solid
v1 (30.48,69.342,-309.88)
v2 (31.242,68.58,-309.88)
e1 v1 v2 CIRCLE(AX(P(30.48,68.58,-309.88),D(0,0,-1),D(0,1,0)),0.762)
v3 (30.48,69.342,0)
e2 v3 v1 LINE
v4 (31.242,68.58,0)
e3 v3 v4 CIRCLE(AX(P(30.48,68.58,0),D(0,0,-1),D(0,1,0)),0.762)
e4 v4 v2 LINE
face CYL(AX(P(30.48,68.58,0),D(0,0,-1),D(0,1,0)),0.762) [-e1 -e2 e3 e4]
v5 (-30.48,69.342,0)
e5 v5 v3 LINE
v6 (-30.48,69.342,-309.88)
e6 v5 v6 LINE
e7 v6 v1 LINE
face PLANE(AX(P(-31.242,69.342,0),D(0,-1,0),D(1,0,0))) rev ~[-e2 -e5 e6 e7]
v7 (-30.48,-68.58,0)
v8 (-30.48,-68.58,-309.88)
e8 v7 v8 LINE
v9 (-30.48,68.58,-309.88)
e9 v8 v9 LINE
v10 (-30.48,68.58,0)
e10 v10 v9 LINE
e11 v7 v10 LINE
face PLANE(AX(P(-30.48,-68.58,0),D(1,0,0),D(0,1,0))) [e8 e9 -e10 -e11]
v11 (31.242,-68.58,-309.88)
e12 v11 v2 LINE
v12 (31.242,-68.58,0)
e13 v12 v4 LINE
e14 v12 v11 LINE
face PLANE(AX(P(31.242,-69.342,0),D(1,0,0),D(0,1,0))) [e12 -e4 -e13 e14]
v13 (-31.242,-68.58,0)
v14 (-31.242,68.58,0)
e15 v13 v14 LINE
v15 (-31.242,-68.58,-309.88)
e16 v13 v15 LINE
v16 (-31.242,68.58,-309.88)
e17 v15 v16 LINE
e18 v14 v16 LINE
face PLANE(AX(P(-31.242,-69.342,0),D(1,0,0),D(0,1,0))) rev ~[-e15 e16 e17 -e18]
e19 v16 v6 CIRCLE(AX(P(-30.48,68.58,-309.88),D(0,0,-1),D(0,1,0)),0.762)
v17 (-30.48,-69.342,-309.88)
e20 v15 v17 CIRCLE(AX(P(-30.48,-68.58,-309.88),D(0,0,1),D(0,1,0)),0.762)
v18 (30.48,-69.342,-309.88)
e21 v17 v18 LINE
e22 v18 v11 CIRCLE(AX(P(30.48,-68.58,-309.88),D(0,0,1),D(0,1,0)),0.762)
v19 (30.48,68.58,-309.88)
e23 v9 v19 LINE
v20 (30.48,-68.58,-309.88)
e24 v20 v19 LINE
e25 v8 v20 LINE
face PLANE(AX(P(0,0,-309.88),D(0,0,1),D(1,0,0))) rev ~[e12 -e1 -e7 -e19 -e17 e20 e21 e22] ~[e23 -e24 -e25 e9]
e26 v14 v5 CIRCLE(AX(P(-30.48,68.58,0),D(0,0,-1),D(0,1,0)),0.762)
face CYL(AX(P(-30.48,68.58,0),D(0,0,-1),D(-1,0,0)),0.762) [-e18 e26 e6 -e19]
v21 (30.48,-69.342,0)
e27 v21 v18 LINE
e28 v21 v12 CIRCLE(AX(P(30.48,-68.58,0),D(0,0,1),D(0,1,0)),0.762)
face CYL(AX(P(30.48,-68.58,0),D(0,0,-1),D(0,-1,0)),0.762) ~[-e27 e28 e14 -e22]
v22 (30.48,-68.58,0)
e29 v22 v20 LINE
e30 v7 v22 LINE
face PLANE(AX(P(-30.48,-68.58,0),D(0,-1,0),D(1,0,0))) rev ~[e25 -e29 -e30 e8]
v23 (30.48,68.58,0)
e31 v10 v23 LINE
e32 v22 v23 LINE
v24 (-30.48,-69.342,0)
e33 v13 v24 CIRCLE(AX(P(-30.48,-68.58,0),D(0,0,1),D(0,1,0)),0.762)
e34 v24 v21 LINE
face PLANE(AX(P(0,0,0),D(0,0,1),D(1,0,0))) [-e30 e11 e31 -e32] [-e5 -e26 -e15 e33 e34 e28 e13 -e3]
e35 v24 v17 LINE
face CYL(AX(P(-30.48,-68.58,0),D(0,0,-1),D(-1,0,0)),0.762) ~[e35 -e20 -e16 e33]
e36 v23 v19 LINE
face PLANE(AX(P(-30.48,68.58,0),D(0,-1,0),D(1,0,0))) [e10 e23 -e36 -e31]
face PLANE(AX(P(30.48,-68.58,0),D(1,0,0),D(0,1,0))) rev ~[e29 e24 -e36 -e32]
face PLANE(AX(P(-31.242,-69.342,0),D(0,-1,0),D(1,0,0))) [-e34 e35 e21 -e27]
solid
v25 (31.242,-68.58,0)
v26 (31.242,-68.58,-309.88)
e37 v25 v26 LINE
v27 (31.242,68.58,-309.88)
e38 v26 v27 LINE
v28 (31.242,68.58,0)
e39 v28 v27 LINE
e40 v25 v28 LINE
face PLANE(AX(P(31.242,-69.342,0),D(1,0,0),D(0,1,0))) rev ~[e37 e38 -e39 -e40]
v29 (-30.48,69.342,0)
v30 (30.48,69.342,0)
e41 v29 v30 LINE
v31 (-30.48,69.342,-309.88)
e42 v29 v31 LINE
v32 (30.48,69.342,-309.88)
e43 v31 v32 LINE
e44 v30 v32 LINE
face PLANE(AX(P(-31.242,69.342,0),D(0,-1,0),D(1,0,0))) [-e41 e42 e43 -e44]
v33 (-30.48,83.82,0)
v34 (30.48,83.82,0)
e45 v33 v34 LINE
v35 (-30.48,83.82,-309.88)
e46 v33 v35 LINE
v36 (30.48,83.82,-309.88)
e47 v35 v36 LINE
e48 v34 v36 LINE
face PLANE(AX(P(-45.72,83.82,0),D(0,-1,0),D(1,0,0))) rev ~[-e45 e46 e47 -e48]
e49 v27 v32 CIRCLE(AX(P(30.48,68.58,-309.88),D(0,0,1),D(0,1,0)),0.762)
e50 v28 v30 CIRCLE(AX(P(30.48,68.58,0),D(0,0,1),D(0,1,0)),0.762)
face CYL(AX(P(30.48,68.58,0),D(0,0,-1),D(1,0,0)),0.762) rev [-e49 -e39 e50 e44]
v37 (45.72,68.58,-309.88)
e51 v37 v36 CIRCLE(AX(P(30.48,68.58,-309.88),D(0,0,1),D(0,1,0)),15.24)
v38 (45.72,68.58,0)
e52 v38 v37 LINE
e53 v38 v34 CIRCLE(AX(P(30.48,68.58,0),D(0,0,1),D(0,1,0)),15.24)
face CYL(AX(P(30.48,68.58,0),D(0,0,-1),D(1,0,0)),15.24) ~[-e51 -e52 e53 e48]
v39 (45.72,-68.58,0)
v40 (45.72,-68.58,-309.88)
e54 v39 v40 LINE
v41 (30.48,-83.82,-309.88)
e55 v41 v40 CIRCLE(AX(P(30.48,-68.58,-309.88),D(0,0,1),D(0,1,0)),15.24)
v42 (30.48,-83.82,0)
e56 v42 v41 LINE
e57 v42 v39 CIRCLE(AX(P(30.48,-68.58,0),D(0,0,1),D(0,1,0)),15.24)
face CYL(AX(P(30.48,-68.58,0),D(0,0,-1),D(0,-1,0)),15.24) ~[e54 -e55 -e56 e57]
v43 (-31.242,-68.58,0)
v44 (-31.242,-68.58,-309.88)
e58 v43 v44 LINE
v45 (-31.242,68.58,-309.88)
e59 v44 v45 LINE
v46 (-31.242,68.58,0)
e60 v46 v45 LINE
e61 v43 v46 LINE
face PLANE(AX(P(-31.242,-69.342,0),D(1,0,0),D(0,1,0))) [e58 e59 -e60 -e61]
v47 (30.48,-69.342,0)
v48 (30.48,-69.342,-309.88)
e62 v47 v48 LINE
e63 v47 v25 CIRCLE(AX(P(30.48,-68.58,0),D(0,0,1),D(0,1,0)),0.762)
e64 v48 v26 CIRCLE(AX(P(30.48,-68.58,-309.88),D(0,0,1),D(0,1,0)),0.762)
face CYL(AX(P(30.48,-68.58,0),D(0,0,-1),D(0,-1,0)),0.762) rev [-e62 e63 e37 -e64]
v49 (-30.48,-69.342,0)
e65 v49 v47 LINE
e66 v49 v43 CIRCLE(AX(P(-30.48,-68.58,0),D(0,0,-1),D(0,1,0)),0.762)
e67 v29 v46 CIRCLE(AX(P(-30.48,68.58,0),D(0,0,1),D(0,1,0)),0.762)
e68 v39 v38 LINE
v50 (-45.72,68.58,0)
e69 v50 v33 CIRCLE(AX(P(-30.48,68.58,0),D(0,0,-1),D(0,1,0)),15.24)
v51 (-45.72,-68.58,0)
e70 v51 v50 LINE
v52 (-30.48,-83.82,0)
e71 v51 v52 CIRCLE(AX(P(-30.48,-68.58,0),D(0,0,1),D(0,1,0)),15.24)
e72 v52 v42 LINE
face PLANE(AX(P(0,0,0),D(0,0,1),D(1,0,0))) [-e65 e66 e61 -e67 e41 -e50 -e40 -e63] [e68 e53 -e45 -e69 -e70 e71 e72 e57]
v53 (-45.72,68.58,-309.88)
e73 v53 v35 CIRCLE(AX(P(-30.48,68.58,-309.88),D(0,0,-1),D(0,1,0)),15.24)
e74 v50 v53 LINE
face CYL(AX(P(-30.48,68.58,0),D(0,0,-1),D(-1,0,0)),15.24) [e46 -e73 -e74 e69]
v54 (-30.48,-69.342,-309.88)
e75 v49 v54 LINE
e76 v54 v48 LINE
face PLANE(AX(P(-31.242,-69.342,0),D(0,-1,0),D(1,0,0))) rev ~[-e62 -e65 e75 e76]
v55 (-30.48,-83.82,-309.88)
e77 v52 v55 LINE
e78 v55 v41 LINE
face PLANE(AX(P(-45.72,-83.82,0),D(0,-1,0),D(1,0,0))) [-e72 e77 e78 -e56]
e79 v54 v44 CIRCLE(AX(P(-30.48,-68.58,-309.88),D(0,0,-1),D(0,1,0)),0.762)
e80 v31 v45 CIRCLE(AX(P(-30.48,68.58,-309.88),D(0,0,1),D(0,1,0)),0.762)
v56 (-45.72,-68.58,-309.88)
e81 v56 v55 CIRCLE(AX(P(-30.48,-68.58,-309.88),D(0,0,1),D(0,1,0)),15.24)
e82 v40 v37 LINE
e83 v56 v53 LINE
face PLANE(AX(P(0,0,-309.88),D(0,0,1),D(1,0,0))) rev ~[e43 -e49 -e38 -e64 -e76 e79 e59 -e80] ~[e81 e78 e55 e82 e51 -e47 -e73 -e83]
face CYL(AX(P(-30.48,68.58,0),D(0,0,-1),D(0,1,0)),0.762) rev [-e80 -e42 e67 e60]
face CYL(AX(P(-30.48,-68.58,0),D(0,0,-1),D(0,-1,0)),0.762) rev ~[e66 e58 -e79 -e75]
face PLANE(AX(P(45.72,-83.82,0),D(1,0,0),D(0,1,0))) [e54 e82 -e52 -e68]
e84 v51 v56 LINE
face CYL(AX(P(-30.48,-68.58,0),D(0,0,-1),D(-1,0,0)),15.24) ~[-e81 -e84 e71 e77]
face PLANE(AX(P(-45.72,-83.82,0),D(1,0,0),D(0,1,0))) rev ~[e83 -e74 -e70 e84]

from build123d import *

# Parameters (mm, degrees)
F5_W      = 91.44
F5_H      = 167.64
F6_DEPTH  = 309.88
F7_R      = 15.24
F8_W      = 62.484
F8_H      = 138.684
F9_DEPTH  = 309.88
F10_W     = 62.484
F10_H     = 138.684
F11_DEPTH = 309.88
F12_W     = 60.96
F12_H     = 137.16
F13_DEPTH = 309.88
F14_R     = 0.762
F15_R     = 0.762


with BuildPart() as f6:
    # F5 (on Top) → F6 (new body)
    with BuildSketch(Plane.XY):
        Rectangle(F5_W, F5_H)
    extrude(amount=-F6_DEPTH)

    # F7
    f7_edges = [f6.edges().sort_by_distance(p)[0] for p in [
        (-45.72, 83.82, -154.94),
        (45.72, 83.82, -154.94),
        (45.72, -83.82, -154.94),
        (-45.72, -83.82, -154.94),
    ]]
    fillet(f7_edges, radius=F7_R)

    # F8 (on face) → F9 (cut)
    with BuildSketch(Plane.XY):
        Rectangle(F8_W, F8_H)
    extrude(amount=-F9_DEPTH, mode=Mode.SUBTRACT)

    # F15
    f15_edges = [f6.edges().sort_by_distance(p)[0] for p in [
        (-31.242, 69.342, -154.94),
        (-31.242, -69.342, -154.94),
        (31.242, -69.342, -154.94),
        (31.242, 69.342, -154.94),
    ]]
    fillet(f15_edges, radius=F15_R)


with BuildPart() as f11:
    # F10 (on face) → F11 (new body)
    with BuildSketch(Plane.XY):
        Rectangle(F10_W, F10_H)
    extrude(amount=-F11_DEPTH)

    # F12 (on face) → F13 (cut)
    with BuildSketch(Plane.XY):
        Rectangle(F12_W, F12_H)
    extrude(amount=-F13_DEPTH, mode=Mode.SUBTRACT)

    # F14
    f14_edges = [f11.edges().sort_by_distance(p)[0] for p in [
        (-31.242, 69.342, -154.94),
        (31.242, 69.342, -154.94),
        (31.242, -69.342, -154.94),
        (-31.242, -69.342, -154.94),
    ]]
    fillet(f14_edges, radius=F14_R)


solid = Compound([f6.part, f11.part])
